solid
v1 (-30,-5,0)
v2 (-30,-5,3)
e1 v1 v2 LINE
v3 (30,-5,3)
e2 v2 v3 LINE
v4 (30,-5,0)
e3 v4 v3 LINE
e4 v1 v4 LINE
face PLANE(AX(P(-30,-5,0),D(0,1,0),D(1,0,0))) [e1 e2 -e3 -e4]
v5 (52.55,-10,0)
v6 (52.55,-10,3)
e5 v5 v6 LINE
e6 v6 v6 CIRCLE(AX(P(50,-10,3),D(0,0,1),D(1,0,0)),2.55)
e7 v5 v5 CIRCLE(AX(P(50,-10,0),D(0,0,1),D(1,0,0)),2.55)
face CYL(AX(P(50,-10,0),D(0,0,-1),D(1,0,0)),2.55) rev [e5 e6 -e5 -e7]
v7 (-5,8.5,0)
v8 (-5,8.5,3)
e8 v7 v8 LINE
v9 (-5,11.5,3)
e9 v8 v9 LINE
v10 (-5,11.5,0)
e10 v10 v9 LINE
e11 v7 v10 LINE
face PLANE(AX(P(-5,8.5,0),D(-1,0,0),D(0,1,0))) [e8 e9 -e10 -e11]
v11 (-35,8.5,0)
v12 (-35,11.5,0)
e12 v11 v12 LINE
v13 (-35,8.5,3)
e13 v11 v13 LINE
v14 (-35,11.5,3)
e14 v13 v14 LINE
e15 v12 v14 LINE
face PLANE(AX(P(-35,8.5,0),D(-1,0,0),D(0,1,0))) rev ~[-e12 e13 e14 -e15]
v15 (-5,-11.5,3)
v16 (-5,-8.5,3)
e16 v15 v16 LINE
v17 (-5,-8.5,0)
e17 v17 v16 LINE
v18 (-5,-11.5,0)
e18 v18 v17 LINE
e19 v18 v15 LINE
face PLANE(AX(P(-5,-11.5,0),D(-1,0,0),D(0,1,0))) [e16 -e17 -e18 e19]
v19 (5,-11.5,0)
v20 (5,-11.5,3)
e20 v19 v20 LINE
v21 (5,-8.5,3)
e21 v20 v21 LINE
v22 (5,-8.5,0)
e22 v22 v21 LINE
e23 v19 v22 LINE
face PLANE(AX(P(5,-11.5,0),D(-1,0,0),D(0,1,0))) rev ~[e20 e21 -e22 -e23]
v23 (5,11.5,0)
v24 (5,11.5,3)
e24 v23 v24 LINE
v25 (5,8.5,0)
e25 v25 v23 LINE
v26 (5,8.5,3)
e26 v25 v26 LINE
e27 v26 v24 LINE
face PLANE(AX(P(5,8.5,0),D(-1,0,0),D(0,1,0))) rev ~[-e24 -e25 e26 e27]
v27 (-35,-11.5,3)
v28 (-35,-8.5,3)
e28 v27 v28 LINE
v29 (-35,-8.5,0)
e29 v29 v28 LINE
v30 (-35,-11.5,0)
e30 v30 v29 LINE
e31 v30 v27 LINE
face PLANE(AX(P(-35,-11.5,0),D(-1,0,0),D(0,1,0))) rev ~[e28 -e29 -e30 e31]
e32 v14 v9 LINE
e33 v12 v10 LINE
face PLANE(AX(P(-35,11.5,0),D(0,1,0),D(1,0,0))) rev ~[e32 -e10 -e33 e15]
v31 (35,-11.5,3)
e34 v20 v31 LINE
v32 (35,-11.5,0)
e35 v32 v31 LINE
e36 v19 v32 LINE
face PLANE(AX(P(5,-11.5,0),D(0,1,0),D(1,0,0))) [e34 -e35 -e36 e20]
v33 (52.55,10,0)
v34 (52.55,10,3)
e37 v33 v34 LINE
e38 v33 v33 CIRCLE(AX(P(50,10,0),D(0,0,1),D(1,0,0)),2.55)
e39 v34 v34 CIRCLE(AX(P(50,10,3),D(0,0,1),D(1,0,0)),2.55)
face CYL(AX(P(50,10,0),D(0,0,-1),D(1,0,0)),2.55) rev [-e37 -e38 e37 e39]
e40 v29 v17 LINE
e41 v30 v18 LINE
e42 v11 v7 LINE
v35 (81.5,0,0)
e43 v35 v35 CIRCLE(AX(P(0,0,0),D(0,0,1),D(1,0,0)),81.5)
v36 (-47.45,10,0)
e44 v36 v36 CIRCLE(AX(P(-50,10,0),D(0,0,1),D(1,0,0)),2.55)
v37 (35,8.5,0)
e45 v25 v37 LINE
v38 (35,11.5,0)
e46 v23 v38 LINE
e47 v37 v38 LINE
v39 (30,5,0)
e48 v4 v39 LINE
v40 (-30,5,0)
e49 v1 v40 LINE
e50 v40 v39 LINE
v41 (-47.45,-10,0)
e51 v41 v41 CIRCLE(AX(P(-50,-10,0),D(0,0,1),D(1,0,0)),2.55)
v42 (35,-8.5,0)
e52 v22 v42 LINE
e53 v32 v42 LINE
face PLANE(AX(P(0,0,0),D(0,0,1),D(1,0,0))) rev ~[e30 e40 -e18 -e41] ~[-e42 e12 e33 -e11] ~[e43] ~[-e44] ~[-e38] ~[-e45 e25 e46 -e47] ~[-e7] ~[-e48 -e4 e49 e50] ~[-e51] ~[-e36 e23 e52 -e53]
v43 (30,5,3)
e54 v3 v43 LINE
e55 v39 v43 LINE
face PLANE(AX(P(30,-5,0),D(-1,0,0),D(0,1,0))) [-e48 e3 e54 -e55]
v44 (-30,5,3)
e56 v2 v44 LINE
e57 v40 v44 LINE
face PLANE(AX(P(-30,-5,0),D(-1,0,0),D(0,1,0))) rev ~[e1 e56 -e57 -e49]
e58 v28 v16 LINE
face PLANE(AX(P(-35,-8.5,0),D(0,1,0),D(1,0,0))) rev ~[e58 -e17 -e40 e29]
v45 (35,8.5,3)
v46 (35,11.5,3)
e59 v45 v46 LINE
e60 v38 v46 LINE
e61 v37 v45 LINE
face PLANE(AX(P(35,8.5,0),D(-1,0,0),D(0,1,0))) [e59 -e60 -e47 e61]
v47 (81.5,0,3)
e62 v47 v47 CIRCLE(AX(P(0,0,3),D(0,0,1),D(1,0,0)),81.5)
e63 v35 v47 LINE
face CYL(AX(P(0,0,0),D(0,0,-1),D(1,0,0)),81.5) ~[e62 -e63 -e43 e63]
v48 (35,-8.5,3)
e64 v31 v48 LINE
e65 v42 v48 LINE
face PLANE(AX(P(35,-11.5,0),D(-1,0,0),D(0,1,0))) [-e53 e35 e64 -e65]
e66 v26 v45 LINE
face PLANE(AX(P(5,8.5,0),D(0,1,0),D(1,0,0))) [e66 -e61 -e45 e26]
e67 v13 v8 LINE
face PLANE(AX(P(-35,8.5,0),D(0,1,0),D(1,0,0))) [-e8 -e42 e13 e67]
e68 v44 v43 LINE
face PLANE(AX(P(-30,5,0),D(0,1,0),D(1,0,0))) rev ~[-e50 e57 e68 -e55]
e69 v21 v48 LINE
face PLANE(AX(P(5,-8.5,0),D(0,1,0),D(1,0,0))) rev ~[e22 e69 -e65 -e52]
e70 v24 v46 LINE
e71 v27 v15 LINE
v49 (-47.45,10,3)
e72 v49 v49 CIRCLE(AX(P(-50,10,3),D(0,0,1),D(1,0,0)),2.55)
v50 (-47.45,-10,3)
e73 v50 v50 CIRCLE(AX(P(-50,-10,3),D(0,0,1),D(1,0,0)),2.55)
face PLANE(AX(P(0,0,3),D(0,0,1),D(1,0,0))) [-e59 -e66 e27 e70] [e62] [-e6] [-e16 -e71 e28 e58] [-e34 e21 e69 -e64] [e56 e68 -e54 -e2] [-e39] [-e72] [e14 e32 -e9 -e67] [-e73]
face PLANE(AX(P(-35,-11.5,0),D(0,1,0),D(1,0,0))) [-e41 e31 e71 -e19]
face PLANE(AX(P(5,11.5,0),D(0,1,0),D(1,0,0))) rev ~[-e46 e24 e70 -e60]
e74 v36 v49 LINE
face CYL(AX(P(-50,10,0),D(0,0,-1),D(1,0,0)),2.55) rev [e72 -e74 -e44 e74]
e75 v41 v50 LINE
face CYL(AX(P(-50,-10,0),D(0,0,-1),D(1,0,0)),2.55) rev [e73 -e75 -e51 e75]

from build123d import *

# Parameters (mm, degrees)
F0_R     = 81.5
F0_R_2   = 2.55
F0_W     = 30
F0_H     = 3
F0_W_2   = 60
F0_H_2   = 10
F1_DEPTH = 3


# Not quite as in the source:
# - a feature names something its author has since deleted; it is built from what else it names


with BuildPart() as f1:
    # F0 (on Top) → F1 (new body)
    with BuildSketch(Plane.XY):
        Circle(F0_R)
        with Locations((-50, -10)):
            Circle(F0_R_2, mode=Mode.SUBTRACT)
        with Locations((-20, -10)):
            Rectangle(F0_W, F0_H, mode=Mode.SUBTRACT)
        with Locations((20, -10)):
            Rectangle(F0_W, F0_H, mode=Mode.SUBTRACT)
        with Locations((50, -10)):
            Circle(F0_R_2, mode=Mode.SUBTRACT)
        with Locations((-50, 10)):
            Circle(F0_R_2, mode=Mode.SUBTRACT)
        with Locations((-20, 10)):
            Rectangle(F0_W, F0_H, mode=Mode.SUBTRACT)
        Rectangle(F0_W_2, F0_H_2, mode=Mode.SUBTRACT)
        with Locations((20, 10)):
            Rectangle(F0_W, F0_H, mode=Mode.SUBTRACT)
        with Locations((50, 10)):
            Circle(F0_R_2, mode=Mode.SUBTRACT)
    extrude(amount=F1_DEPTH)


solid = f1.part
